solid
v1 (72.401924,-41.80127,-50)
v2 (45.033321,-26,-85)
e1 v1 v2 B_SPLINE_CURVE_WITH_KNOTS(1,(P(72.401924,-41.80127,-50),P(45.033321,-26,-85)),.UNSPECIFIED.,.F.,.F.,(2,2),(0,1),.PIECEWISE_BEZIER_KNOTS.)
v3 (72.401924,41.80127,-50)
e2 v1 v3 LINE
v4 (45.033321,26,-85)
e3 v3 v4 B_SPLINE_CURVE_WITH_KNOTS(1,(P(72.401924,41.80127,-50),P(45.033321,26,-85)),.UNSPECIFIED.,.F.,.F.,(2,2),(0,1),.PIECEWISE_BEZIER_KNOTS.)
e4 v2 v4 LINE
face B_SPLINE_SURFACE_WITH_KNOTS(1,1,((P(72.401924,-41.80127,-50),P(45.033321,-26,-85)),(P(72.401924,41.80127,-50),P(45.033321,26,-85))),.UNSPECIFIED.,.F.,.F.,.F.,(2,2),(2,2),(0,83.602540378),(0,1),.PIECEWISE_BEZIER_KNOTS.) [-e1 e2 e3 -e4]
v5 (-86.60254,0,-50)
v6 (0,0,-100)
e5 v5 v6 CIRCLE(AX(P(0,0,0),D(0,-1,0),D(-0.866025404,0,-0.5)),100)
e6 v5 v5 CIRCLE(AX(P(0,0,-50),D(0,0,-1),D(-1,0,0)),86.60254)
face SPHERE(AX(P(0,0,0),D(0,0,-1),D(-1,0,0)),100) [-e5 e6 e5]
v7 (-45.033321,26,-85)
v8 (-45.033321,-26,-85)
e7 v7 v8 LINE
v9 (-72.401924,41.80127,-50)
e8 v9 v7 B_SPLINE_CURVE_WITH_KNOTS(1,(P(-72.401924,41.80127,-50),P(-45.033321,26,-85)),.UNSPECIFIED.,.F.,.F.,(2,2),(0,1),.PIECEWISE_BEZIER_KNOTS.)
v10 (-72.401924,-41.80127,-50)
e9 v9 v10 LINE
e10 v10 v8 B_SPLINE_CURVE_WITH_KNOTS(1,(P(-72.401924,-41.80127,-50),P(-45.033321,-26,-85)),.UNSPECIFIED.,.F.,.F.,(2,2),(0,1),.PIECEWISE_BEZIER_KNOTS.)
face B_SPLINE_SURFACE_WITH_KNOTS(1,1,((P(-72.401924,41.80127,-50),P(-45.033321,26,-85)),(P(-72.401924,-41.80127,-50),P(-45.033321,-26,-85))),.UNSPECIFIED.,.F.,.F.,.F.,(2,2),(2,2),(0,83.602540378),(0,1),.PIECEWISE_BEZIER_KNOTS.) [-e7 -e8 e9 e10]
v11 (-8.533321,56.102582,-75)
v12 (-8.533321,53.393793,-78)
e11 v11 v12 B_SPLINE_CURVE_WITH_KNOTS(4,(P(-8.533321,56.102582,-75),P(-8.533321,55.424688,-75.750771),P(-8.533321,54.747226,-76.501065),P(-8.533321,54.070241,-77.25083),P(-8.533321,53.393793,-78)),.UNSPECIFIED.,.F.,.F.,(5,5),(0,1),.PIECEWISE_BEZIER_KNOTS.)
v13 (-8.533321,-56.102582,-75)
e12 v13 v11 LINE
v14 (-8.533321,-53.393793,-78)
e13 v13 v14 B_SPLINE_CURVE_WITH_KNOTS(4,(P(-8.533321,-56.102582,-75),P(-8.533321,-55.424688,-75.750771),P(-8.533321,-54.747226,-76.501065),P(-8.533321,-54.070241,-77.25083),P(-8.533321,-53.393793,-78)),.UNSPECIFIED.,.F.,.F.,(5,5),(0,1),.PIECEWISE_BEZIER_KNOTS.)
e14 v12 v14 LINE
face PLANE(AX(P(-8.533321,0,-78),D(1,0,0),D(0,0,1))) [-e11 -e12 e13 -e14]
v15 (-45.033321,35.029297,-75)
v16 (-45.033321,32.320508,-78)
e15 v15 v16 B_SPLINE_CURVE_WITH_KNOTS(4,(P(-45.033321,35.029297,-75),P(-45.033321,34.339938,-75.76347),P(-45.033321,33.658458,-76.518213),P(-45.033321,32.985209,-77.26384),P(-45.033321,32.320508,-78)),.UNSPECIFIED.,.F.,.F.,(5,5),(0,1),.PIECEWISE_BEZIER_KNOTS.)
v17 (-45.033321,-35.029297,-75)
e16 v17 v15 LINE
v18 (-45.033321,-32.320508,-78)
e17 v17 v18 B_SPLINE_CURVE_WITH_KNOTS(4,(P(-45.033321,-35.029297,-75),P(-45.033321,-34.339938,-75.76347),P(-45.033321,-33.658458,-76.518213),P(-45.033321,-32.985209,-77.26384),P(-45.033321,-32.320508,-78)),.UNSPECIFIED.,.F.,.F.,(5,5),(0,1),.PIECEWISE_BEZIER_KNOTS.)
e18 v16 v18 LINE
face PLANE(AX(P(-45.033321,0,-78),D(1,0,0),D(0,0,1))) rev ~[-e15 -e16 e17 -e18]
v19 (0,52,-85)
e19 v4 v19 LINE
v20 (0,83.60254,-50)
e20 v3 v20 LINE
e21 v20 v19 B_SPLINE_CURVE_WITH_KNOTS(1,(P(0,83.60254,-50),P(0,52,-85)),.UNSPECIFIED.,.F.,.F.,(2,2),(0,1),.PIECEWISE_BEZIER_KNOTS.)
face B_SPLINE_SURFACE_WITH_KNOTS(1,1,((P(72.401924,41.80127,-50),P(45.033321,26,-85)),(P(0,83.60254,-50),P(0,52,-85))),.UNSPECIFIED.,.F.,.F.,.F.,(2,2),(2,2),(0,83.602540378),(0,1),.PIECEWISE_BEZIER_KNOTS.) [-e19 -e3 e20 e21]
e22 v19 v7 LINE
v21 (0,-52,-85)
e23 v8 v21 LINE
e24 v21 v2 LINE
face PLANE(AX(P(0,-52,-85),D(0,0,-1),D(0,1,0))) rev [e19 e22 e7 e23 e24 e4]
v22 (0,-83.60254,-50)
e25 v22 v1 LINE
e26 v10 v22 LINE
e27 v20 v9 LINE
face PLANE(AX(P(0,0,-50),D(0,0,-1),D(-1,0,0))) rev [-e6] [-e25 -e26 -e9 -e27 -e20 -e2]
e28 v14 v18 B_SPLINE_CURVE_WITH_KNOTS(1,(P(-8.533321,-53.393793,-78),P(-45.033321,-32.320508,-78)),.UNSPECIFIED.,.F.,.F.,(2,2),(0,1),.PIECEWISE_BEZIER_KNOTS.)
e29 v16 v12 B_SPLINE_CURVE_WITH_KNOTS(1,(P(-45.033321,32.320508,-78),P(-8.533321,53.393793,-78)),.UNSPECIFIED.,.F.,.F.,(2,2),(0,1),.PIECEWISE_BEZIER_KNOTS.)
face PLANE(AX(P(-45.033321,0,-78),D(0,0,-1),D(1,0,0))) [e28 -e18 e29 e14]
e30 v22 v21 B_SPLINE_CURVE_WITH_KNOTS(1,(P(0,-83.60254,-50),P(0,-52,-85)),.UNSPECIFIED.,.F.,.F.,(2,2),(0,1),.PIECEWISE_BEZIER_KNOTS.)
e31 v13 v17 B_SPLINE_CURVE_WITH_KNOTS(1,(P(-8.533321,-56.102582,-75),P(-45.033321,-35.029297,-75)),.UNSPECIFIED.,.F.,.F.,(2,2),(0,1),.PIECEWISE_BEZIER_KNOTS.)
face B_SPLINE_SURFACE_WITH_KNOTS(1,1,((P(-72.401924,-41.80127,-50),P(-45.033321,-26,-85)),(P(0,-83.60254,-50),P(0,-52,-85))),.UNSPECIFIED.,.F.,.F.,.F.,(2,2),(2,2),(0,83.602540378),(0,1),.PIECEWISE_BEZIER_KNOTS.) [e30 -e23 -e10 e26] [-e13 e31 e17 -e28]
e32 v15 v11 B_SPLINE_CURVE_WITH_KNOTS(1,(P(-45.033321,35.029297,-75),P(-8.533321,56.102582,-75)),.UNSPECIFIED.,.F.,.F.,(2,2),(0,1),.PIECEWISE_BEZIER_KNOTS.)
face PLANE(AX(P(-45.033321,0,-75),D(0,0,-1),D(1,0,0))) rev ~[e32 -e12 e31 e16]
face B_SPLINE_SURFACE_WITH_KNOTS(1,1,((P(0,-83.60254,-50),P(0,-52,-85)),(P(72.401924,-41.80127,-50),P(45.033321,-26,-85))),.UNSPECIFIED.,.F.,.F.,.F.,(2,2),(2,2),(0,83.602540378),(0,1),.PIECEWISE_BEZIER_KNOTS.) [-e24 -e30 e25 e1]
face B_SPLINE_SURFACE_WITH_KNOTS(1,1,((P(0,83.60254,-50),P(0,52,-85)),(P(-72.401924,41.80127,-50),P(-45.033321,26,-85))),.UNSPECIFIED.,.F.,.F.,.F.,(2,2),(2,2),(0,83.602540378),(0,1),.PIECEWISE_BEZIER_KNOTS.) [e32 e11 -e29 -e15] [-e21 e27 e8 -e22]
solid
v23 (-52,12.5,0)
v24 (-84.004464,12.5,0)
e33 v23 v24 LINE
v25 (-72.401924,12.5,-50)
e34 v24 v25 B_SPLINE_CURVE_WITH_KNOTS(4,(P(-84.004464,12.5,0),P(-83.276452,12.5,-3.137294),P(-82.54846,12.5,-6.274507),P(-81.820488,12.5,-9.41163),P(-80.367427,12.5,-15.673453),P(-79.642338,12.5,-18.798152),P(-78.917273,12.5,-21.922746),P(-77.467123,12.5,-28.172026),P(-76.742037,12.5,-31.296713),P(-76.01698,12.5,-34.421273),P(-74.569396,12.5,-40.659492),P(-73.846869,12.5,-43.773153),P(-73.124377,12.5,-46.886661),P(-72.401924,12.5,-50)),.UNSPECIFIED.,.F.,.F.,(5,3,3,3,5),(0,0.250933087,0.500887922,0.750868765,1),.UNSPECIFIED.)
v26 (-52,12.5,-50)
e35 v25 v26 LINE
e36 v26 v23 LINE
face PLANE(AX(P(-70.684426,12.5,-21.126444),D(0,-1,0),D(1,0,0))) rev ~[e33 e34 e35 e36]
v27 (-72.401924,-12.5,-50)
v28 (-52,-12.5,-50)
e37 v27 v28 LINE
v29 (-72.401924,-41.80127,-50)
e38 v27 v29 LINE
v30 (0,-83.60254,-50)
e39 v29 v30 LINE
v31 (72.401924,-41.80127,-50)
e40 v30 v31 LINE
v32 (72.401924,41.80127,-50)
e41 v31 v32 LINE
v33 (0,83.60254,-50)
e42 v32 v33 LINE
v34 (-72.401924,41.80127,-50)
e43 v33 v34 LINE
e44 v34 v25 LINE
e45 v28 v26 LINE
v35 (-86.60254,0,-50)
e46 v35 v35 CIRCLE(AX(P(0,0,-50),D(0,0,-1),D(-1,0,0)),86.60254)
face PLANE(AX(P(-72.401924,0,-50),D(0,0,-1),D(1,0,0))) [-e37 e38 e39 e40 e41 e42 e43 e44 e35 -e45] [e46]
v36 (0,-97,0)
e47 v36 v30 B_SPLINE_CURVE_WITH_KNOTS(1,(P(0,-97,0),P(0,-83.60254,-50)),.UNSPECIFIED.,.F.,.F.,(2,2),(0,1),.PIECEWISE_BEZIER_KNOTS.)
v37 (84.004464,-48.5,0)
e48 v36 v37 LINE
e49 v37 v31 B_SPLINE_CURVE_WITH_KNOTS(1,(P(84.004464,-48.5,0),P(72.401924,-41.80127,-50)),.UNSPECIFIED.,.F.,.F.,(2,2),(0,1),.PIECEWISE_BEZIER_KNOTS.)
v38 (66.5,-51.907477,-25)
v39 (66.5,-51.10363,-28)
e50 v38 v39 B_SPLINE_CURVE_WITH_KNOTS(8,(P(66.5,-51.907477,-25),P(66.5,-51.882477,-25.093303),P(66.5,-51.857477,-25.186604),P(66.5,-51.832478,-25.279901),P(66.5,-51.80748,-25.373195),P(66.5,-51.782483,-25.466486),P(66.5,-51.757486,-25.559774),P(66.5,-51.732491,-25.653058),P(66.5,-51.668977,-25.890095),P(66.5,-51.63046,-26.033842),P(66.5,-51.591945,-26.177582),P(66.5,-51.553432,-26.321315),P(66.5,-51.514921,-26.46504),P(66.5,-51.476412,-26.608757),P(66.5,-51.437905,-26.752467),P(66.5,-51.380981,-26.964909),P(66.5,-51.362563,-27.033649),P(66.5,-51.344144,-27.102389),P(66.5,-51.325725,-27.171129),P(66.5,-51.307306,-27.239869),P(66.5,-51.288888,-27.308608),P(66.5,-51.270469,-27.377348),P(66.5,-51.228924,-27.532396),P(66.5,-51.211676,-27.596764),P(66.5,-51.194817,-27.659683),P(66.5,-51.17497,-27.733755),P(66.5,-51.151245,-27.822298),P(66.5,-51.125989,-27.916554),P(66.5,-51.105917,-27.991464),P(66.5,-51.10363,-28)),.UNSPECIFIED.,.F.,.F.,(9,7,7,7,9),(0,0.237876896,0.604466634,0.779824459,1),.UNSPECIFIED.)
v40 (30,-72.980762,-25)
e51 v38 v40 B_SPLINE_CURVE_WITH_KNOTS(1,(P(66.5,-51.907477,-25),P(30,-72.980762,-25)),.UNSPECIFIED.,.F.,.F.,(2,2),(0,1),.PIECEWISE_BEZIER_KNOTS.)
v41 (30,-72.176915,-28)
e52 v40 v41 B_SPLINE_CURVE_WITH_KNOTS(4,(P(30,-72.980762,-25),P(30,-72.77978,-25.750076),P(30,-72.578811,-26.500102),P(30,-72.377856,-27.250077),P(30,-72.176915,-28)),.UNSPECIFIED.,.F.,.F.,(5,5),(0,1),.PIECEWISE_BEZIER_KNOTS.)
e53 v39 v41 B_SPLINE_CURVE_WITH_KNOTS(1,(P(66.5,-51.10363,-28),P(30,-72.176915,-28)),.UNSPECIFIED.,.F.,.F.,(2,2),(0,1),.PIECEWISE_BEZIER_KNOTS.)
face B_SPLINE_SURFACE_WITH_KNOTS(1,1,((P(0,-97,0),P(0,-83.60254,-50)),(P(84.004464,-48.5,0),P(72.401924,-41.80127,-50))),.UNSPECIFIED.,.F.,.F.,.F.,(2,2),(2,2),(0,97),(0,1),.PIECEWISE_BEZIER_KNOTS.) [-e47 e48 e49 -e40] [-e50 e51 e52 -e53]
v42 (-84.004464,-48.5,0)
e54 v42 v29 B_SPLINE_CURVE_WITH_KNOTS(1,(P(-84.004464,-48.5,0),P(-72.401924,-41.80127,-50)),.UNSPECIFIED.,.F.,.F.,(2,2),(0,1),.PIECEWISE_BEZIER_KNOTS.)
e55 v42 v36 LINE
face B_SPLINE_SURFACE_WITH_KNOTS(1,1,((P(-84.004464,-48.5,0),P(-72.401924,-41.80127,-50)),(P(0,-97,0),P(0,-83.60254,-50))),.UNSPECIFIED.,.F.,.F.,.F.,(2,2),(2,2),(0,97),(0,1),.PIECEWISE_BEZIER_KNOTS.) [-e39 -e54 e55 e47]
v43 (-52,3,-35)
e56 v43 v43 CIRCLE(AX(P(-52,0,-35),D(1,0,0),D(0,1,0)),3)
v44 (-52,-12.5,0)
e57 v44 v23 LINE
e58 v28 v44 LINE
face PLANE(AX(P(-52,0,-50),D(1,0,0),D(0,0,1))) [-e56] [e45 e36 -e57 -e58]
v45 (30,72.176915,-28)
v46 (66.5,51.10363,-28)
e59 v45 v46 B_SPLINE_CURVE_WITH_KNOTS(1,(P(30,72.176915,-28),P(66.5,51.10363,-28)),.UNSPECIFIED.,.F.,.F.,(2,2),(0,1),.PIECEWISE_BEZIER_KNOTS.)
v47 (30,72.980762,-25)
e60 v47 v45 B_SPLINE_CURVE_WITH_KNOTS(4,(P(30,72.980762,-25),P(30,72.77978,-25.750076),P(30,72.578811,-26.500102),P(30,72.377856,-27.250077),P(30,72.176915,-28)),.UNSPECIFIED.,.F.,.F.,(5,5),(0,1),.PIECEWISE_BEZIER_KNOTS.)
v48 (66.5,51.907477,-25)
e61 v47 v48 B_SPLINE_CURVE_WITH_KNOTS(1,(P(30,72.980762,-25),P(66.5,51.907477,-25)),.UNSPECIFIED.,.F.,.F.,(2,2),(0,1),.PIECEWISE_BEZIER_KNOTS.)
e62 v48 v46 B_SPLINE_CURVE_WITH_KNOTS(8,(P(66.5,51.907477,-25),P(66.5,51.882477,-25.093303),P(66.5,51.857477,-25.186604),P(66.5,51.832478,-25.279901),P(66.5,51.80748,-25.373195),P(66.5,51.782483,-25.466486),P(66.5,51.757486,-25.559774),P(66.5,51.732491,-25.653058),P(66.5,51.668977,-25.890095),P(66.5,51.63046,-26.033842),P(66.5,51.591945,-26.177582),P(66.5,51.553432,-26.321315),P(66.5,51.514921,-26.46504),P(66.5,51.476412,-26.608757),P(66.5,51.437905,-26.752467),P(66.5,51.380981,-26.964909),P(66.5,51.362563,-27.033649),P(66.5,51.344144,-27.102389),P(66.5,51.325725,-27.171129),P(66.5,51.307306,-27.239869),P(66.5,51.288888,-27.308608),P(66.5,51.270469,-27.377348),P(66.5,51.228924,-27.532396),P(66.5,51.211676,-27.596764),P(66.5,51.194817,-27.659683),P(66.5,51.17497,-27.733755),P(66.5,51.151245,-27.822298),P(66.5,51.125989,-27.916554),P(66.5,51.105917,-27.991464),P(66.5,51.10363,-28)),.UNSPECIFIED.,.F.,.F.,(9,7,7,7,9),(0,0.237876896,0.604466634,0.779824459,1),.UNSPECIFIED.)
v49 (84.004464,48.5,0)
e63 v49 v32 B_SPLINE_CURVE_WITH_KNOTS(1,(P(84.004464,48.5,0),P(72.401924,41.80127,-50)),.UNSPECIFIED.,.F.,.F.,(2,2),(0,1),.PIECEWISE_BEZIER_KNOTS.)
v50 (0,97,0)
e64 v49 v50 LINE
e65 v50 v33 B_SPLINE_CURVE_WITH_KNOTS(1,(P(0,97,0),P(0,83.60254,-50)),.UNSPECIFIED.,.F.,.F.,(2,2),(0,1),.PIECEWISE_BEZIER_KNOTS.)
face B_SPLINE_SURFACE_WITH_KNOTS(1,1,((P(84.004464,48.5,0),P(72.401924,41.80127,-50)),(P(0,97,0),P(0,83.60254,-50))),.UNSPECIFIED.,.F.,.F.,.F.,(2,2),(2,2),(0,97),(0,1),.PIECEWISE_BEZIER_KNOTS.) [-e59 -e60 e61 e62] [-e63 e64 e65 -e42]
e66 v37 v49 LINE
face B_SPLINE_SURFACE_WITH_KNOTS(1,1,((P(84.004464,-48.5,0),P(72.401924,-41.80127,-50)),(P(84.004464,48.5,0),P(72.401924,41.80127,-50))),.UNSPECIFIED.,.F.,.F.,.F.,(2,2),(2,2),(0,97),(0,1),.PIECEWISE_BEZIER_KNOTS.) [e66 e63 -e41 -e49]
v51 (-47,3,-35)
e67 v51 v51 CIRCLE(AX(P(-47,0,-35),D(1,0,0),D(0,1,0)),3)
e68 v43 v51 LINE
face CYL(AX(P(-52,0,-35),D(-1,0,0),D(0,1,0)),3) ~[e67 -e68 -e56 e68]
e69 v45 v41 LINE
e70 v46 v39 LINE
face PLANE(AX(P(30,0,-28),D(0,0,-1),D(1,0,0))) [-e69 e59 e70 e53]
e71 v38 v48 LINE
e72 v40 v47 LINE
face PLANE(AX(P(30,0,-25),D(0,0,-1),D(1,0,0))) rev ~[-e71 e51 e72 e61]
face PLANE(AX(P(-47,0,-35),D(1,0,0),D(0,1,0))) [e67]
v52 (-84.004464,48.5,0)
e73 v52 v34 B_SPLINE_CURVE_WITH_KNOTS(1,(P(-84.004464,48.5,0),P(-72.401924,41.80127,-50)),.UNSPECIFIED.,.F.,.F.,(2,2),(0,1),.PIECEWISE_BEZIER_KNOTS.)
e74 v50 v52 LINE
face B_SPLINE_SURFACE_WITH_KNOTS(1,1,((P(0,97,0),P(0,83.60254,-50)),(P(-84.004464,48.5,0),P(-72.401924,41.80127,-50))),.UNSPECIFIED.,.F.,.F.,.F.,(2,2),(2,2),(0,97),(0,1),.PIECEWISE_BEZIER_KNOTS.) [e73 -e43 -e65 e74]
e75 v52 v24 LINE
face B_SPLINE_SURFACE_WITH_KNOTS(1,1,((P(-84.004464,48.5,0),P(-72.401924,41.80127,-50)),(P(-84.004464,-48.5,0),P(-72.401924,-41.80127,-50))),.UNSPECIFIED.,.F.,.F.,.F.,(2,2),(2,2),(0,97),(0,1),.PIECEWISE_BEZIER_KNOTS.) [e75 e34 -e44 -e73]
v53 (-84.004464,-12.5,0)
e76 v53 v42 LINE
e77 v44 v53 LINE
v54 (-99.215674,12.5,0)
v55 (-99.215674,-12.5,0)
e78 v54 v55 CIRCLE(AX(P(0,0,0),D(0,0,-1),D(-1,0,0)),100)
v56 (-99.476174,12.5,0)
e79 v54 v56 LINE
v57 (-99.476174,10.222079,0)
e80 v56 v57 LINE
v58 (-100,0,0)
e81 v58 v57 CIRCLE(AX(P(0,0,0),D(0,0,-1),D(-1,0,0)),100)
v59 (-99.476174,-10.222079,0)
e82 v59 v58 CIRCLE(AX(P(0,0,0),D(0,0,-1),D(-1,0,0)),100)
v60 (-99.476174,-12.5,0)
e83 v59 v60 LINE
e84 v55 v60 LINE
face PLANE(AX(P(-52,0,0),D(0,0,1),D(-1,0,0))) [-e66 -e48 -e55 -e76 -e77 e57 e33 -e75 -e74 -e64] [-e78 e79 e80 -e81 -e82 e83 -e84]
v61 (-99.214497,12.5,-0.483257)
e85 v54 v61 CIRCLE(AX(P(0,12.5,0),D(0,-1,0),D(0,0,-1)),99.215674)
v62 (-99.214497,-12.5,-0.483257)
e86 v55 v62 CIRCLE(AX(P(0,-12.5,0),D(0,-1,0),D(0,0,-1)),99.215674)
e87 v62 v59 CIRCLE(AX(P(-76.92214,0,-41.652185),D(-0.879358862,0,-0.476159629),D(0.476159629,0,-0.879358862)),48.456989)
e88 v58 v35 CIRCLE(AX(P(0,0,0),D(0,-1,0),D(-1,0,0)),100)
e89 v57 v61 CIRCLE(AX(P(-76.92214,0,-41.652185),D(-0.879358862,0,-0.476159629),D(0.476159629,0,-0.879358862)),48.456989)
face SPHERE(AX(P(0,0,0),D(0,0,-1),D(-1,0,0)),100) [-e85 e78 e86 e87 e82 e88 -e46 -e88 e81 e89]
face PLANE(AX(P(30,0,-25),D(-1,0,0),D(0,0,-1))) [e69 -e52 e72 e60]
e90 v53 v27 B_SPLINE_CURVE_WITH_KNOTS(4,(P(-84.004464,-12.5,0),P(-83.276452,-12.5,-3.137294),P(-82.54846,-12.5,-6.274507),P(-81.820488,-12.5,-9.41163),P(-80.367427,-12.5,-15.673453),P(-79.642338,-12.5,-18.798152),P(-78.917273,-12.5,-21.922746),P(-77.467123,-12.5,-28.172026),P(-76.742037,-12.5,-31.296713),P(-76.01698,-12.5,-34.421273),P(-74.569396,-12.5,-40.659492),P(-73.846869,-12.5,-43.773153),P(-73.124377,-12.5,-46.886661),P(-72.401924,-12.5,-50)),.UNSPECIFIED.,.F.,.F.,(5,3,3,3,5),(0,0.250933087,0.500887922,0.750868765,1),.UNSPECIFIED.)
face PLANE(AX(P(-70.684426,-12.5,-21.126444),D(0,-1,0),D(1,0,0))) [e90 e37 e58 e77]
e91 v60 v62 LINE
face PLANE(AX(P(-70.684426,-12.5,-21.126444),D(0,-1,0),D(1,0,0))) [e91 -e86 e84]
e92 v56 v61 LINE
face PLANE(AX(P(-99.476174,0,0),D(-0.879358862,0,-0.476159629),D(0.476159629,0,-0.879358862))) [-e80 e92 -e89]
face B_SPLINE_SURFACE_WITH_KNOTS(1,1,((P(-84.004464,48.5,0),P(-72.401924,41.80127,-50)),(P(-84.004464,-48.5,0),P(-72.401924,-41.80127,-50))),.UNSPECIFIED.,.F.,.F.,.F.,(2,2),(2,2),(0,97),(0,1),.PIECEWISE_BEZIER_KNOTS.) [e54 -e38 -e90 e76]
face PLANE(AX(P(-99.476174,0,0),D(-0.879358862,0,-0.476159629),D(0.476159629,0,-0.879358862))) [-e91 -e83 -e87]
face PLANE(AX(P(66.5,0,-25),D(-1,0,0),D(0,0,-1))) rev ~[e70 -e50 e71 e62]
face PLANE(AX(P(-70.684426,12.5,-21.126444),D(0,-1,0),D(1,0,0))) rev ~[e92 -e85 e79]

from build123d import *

# Parameters (mm, degrees)
F11_W      = 36.5
F11_H      = 3
F15_DEPTH  = 12.5
F16_R      = 3
F17_DEPTH  = 5
F18_W      = 36.5
F18_H      = 3
F19_FACE_W = 36.5
F19_FACE_H = 3


with BuildPart() as f1:
    # F0 (on Front) → F1 (revolve)
    with BuildSketch(Plane.XZ):
        with BuildLine():
            Line((0, -50), (-86.6025403784, -50))
            ThreePointArc((-86.6025403784, -50), (-50, -86.6025403784), (0, -100))
            Line((0, -100), (0, -50))
        make_face()
    revolve(axis=Axis((0, 0, -75), (0, 0, -1)))

    # F3 (on face) → F6 section 0
    with BuildSketch(Plane.XY.offset(-50)):
        Polygon((0, -83.6025403784), (72.4019237886, -41.8012701892), (72.4019237886, 41.8012701892), (0, 83.6025403784), (-72.4019237886, 41.8012701892), (-72.4019237886, -41.8012701892), align=None)
    # F5 (on offset) → F6 section 1
    with BuildSketch(Plane.XY.offset(-85)):
        Polygon((45.0333209968, 26), (0, 52), (-45.0333209968, 26), (-45.0333209968, -26), (0, -52), (45.0333209968, -26), align=None)
    loft(mode=Mode.SUBTRACT)

    # F11 (on Front) → F12 (join, up to the last surface of F1)
    with BuildSketch(Plane.XZ):
        with Locations((-26.7833209968, -76.5)):
            Rectangle(F11_W, F11_H)
    extrude(until=Until.LAST)

    # F11 (on Front) → F13 (join, up to the last surface of F1)
    with BuildSketch(Plane.XZ):
        with Locations((-26.7833209968, -76.5)):
            Rectangle(F11_W, F11_H)
    extrude(until=Until.LAST, dir=(0, 1, 0))


with BuildPart() as f8:
    # F7 (on Front) → F8 (revolve)
    with BuildSketch(Plane.XZ):
        with BuildLine():
            ThreePointArc((-100, 0), (-96.5925826289, -25.8819045103), (-86.6025403784, -50))
            Line((-86.6025403784, -50), (0, -50))
            Line((0, -50), (0, 0))
            Line((0, 0), (-100, 0))
        make_face()
    revolve(axis=Axis((0, 0, -25), (0, 0, -1)))

    # F9 (on face) → F10 section 0
    with BuildSketch(Plane.XY):
        Polygon((0, -97), (84.0044641671, -48.5), (84.0044641671, 48.5), (0, 97), (-84.0044641671, 48.5), (-84.0044641671, -48.5), align=None)
    # F3 (on face) → F10 section 1
    with BuildSketch(Plane.XY.offset(-50)):
        Polygon((0, -83.6025403784), (72.4019237886, -41.8012701892), (72.4019237886, 41.8012701892), (0, 83.6025403784), (-72.4019237886, 41.8012701892), (-72.4019237886, -41.8012701892), align=None)
    loft(mode=Mode.SUBTRACT)

    # F14 (on Front) → F15 (join, symmetric)
    with BuildSketch(Plane.XZ):
        Polygon((-52, 0), (-99.4761735201, 0), (-72.4019237886, -50), (-52, -50), align=None)
    extrude(amount=F15_DEPTH, both=True)

    # F16 (on face) → F17 (join)
    with BuildSketch(Plane.YZ.offset(-52)):
        with Locations((0, -35)):
            Circle(F16_R)
    extrude(amount=F17_DEPTH)

    # F18 (on Front) → F19 (join, up to the last surface of F8)
    with BuildSketch(Plane.XZ):
        with Locations((48.25, -26.5)):
            Rectangle(F18_W, F18_H)
    extrude(until=Until.LAST)

    # F19_face (on face) → F20 (join, up to the last surface of F8)
    with BuildSketch(Plane(origin=(48.25, 0, -26.5), x_dir=(1, 0, 0), z_dir=(0, 1, 0))):
        Rectangle(F19_FACE_W, F19_FACE_H)
    extrude(until=Until.LAST)


solid = Compound([f1.part, f8.part])
